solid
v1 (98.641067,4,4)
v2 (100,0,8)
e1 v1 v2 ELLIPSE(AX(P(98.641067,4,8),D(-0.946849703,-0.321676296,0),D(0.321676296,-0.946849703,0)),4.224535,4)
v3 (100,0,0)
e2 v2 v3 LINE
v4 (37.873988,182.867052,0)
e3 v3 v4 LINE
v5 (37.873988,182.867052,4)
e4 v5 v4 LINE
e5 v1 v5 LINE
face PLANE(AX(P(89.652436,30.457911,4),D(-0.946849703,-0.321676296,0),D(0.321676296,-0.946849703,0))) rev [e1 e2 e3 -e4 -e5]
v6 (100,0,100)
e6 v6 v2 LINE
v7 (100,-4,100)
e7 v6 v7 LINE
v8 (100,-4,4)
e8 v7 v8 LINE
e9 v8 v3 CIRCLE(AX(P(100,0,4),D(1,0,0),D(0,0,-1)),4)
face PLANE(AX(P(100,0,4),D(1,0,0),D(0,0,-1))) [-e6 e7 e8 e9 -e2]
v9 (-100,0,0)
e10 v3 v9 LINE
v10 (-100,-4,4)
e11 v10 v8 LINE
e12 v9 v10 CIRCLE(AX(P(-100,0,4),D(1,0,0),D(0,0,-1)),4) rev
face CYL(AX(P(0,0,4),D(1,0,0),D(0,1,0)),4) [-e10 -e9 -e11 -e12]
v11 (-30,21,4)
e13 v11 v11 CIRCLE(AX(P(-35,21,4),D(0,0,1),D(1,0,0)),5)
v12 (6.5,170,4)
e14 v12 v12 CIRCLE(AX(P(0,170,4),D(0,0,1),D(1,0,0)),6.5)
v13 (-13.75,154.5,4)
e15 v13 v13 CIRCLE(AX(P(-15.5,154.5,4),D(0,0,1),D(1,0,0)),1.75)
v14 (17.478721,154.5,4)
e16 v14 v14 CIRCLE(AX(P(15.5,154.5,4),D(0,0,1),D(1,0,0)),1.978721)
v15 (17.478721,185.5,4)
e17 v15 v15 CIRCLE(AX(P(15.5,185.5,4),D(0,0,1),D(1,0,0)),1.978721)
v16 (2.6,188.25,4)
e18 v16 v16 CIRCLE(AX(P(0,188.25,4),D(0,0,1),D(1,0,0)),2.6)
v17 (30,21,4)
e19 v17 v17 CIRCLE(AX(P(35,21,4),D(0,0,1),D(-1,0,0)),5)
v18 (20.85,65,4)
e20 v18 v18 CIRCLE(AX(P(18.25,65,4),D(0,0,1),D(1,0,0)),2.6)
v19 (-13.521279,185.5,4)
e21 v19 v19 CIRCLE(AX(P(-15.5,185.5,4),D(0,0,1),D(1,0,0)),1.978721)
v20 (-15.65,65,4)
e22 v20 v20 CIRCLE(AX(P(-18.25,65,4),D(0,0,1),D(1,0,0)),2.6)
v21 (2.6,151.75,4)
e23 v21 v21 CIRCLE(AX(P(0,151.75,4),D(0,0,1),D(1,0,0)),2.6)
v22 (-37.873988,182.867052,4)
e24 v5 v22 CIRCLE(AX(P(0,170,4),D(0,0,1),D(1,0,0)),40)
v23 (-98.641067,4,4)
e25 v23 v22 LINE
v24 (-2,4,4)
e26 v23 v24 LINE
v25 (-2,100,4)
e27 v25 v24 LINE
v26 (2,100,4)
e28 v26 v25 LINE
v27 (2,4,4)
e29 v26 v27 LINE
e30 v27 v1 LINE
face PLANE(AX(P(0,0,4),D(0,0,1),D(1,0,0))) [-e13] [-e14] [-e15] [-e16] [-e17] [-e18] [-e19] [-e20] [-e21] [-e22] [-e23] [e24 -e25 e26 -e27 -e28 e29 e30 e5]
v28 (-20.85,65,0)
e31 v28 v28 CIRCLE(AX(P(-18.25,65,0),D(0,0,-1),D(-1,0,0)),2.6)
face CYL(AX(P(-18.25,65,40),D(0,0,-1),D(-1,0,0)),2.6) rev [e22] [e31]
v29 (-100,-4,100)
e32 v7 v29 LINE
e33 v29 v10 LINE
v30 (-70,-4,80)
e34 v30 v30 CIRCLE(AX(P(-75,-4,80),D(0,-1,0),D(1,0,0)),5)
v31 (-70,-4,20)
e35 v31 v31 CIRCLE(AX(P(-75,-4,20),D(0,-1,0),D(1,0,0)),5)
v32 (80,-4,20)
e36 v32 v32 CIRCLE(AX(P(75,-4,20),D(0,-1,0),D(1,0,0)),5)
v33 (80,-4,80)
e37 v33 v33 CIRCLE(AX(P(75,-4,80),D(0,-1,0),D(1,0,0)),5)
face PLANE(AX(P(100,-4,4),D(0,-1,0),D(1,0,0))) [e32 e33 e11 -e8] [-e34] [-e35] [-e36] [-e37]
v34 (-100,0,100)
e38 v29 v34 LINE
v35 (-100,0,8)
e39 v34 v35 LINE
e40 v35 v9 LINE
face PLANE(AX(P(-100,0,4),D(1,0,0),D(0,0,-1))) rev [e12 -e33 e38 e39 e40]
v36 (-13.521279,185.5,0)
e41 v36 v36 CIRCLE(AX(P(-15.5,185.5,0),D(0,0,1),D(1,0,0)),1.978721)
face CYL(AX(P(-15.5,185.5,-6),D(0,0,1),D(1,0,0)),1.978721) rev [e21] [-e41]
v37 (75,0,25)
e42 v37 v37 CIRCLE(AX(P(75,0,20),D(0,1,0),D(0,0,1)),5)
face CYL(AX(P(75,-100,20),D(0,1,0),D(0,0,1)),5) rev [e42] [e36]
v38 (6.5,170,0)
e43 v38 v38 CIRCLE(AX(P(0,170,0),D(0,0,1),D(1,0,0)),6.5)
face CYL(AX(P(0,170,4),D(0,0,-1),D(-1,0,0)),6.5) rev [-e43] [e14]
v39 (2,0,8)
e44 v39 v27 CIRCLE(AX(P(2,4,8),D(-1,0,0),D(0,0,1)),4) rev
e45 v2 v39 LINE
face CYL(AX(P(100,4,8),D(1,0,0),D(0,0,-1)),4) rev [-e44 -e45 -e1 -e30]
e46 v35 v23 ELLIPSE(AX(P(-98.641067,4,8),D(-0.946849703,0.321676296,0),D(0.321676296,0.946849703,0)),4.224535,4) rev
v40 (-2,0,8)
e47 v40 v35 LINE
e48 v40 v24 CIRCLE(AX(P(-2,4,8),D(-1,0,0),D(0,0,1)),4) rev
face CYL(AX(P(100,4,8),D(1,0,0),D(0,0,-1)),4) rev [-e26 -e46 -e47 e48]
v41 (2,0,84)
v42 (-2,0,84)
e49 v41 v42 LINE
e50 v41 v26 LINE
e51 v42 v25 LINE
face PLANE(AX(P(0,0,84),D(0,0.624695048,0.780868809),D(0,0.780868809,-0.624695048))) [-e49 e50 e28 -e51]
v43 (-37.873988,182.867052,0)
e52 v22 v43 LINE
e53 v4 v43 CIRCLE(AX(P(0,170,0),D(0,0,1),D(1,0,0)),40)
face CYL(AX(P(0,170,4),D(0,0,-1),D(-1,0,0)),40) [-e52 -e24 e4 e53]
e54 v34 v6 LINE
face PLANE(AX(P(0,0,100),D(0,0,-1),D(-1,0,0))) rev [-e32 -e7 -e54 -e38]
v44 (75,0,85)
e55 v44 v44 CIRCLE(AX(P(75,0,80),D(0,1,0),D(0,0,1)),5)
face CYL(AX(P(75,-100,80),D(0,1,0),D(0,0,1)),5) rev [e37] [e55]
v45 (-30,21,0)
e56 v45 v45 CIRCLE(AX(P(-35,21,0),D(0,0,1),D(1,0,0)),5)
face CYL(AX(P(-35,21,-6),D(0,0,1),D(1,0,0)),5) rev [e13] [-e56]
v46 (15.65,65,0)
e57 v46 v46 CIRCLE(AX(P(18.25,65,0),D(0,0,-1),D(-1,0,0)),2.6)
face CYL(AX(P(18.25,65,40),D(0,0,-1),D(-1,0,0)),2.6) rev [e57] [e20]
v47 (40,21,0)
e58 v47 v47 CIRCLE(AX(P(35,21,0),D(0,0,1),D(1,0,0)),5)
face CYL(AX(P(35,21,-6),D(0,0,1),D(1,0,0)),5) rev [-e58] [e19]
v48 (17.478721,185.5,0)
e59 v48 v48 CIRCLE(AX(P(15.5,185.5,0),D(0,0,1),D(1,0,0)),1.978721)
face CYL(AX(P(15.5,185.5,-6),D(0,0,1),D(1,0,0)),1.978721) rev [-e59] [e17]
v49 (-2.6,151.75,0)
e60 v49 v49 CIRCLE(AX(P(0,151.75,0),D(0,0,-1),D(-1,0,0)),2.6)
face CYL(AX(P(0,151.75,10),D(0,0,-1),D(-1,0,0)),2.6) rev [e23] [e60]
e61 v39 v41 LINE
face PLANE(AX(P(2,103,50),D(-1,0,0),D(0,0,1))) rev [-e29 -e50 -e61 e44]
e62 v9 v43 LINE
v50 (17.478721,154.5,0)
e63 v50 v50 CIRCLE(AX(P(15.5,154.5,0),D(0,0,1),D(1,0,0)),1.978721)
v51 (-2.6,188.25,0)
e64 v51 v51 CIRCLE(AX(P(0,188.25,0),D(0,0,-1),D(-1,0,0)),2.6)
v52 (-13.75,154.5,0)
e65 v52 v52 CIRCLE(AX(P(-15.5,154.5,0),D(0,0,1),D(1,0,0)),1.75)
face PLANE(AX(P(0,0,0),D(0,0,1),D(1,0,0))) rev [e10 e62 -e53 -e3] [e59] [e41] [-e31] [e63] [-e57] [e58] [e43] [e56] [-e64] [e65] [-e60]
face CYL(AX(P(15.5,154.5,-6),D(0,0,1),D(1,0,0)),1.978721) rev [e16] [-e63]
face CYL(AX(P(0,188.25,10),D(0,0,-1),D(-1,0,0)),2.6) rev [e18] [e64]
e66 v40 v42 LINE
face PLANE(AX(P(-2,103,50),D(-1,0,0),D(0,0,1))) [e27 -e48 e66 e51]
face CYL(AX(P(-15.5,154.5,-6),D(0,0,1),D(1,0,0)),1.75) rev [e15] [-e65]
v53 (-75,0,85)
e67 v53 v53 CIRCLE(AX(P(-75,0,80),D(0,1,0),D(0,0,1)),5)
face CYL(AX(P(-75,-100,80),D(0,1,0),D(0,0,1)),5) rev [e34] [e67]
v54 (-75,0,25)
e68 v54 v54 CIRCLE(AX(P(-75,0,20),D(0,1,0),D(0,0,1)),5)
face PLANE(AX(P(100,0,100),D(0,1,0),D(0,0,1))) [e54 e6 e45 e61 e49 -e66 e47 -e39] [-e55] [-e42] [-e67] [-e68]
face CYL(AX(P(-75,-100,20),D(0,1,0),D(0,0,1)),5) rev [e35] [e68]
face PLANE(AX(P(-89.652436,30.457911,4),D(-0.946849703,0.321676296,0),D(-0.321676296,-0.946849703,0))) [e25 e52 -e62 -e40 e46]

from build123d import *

# Parameters (mm, degrees)
SKETCH1_R           = 6.5
BOSS_EXTRUDE1_DEPTH = 4
SKETCH4_R           = 2.6
CUT_EXTRUDE1_DEPTH  = 10
SKETCH5_W           = 200
SKETCH5_H           = 4
BOSS_EXTRUDE2_DEPTH = 100
FILLET1_R           = 4
RIB5_START          = -2
RIB5_DEPTH          = 4
SKETCH8_R           = 5
CUT_EXTRUDE4_DEPTH  = 100
SKETCH11_R          = 2.6
CUT_EXTRUDE7_DEPTH  = 40
SKETCH9_R           = 5
CUT_EXTRUDE8_DEPTH  = 10
SKETCH12_R          = 1.978720795
SKETCH12_R_2        = 1.75
CUT_EXTRUDE9_DEPTH  = 10


# Read off the part's stored shape, not the designer's step: Rib5
with BuildPart() as part:
    # Sketch1 → Boss-Extrude1 (new body)
    with BuildSketch(Plane.XY):
        with BuildLine():
            Line((100, 0), (37.87398813, 182.867051841))
            ThreePointArc((37.87398813, 182.867051841), (0, 210), (-37.87398813, 182.867051841))
            Line((-37.87398813, 182.867051841), (-100, 0))
            Line((-100, 0), (-100, -4))
            Line((-100, -4), (100, -4))
            Line((100, -4), (100, 0))
        make_face()
        with Locations((0, 170)):
            Circle(SKETCH1_R, mode=Mode.SUBTRACT)
    extrude(amount=BOSS_EXTRUDE1_DEPTH)

    # Sketch4 → Cut-Extrude1 (cut)
    with BuildSketch(Plane(origin=(0, 0, 0), x_dir=(-1, 0, 0), z_dir=(0, 0, -1))):
        with Locations((0, 188.25)):
            Circle(SKETCH4_R)
        with Locations((0, 151.75)):
            Circle(SKETCH4_R)
    extrude(amount=-CUT_EXTRUDE1_DEPTH, mode=Mode.SUBTRACT)

    # Sketch5 → Boss-Extrude2 (add)
    with BuildSketch(Plane(origin=(0, 0, 0), x_dir=(-1, 0, 0), z_dir=(0, 0, -1))):
        with Locations((0, -2)):
            Rectangle(SKETCH5_W, SKETCH5_H)
    extrude(amount=-BOSS_EXTRUDE2_DEPTH)

    # Fillet1
    fillet1_edges = [part.edges().sort_by_distance(p)[0] for p in [
        (0, -4, 0),
        (0, 0, 4),
    ]]
    fillet(fillet1_edges, radius=FILLET1_R)

    # Rib5 outline → Rib5 (add)
    with BuildSketch(Plane.YZ.offset(RIB5_START)):
        with BuildLine():
            Line((4, 4), (100, 4))
            Line((100, 4), (0, 84))
            Line((0, 84), (0, 8))
            ThreePointArc((0, 8), (1.171572875, 5.171572875), (4, 4))
        make_face()
    extrude(amount=RIB5_DEPTH)

    # Sketch8 → Cut-Extrude4 (cut)
    with BuildSketch(Plane(origin=(0, 0, 0), x_dir=(1, 0, 0), z_dir=(0, 1, 0))):
        with Locations(Location((-75, -80, 0), (0, 0, 270))):
            Circle(SKETCH8_R)
        with Locations(Location((-75, -20, 0), (0, 0, 270))):
            Circle(SKETCH8_R)
        with Locations(Location((75, -80, 0), (0, 0, 270))):
            Circle(SKETCH8_R)
        with Locations(Location((75, -20, 0), (0, 0, 270))):
            Circle(SKETCH8_R)
    extrude(amount=-CUT_EXTRUDE4_DEPTH, mode=Mode.SUBTRACT)

    # Sketch11 → Cut-Extrude7 (cut)
    with BuildSketch(Plane(origin=(0, 0, 0), x_dir=(-1, 0, 0), z_dir=(0, 0, -1))):
        with Locations((-18.25, 65)):
            Circle(SKETCH11_R)
        with Locations((18.25, 65)):
            Circle(SKETCH11_R)
    extrude(amount=-CUT_EXTRUDE7_DEPTH, mode=Mode.SUBTRACT)

    # Sketch9 → Cut-Extrude8 (cut)
    with BuildSketch(Plane.XY.offset(4)):
        with Locations((-35, 21)):
            Circle(SKETCH9_R)
        with Locations((35, 21)):
            Circle(SKETCH9_R)
    extrude(amount=-CUT_EXTRUDE8_DEPTH, mode=Mode.SUBTRACT)

    # Sketch12 → Cut-Extrude9 (cut)
    with BuildSketch(Plane.XY.offset(4)):
        with Locations((-15.5, 185.5)):
            Circle(SKETCH12_R)
        with Locations((15.5, 185.5)):
            Circle(SKETCH12_R)
        with Locations((15.5, 154.5)):
            Circle(SKETCH12_R)
        with Locations((-15.5, 154.5)):
            Circle(SKETCH12_R_2)
    extrude(amount=-CUT_EXTRUDE9_DEPTH, mode=Mode.SUBTRACT)


solid = part.part
